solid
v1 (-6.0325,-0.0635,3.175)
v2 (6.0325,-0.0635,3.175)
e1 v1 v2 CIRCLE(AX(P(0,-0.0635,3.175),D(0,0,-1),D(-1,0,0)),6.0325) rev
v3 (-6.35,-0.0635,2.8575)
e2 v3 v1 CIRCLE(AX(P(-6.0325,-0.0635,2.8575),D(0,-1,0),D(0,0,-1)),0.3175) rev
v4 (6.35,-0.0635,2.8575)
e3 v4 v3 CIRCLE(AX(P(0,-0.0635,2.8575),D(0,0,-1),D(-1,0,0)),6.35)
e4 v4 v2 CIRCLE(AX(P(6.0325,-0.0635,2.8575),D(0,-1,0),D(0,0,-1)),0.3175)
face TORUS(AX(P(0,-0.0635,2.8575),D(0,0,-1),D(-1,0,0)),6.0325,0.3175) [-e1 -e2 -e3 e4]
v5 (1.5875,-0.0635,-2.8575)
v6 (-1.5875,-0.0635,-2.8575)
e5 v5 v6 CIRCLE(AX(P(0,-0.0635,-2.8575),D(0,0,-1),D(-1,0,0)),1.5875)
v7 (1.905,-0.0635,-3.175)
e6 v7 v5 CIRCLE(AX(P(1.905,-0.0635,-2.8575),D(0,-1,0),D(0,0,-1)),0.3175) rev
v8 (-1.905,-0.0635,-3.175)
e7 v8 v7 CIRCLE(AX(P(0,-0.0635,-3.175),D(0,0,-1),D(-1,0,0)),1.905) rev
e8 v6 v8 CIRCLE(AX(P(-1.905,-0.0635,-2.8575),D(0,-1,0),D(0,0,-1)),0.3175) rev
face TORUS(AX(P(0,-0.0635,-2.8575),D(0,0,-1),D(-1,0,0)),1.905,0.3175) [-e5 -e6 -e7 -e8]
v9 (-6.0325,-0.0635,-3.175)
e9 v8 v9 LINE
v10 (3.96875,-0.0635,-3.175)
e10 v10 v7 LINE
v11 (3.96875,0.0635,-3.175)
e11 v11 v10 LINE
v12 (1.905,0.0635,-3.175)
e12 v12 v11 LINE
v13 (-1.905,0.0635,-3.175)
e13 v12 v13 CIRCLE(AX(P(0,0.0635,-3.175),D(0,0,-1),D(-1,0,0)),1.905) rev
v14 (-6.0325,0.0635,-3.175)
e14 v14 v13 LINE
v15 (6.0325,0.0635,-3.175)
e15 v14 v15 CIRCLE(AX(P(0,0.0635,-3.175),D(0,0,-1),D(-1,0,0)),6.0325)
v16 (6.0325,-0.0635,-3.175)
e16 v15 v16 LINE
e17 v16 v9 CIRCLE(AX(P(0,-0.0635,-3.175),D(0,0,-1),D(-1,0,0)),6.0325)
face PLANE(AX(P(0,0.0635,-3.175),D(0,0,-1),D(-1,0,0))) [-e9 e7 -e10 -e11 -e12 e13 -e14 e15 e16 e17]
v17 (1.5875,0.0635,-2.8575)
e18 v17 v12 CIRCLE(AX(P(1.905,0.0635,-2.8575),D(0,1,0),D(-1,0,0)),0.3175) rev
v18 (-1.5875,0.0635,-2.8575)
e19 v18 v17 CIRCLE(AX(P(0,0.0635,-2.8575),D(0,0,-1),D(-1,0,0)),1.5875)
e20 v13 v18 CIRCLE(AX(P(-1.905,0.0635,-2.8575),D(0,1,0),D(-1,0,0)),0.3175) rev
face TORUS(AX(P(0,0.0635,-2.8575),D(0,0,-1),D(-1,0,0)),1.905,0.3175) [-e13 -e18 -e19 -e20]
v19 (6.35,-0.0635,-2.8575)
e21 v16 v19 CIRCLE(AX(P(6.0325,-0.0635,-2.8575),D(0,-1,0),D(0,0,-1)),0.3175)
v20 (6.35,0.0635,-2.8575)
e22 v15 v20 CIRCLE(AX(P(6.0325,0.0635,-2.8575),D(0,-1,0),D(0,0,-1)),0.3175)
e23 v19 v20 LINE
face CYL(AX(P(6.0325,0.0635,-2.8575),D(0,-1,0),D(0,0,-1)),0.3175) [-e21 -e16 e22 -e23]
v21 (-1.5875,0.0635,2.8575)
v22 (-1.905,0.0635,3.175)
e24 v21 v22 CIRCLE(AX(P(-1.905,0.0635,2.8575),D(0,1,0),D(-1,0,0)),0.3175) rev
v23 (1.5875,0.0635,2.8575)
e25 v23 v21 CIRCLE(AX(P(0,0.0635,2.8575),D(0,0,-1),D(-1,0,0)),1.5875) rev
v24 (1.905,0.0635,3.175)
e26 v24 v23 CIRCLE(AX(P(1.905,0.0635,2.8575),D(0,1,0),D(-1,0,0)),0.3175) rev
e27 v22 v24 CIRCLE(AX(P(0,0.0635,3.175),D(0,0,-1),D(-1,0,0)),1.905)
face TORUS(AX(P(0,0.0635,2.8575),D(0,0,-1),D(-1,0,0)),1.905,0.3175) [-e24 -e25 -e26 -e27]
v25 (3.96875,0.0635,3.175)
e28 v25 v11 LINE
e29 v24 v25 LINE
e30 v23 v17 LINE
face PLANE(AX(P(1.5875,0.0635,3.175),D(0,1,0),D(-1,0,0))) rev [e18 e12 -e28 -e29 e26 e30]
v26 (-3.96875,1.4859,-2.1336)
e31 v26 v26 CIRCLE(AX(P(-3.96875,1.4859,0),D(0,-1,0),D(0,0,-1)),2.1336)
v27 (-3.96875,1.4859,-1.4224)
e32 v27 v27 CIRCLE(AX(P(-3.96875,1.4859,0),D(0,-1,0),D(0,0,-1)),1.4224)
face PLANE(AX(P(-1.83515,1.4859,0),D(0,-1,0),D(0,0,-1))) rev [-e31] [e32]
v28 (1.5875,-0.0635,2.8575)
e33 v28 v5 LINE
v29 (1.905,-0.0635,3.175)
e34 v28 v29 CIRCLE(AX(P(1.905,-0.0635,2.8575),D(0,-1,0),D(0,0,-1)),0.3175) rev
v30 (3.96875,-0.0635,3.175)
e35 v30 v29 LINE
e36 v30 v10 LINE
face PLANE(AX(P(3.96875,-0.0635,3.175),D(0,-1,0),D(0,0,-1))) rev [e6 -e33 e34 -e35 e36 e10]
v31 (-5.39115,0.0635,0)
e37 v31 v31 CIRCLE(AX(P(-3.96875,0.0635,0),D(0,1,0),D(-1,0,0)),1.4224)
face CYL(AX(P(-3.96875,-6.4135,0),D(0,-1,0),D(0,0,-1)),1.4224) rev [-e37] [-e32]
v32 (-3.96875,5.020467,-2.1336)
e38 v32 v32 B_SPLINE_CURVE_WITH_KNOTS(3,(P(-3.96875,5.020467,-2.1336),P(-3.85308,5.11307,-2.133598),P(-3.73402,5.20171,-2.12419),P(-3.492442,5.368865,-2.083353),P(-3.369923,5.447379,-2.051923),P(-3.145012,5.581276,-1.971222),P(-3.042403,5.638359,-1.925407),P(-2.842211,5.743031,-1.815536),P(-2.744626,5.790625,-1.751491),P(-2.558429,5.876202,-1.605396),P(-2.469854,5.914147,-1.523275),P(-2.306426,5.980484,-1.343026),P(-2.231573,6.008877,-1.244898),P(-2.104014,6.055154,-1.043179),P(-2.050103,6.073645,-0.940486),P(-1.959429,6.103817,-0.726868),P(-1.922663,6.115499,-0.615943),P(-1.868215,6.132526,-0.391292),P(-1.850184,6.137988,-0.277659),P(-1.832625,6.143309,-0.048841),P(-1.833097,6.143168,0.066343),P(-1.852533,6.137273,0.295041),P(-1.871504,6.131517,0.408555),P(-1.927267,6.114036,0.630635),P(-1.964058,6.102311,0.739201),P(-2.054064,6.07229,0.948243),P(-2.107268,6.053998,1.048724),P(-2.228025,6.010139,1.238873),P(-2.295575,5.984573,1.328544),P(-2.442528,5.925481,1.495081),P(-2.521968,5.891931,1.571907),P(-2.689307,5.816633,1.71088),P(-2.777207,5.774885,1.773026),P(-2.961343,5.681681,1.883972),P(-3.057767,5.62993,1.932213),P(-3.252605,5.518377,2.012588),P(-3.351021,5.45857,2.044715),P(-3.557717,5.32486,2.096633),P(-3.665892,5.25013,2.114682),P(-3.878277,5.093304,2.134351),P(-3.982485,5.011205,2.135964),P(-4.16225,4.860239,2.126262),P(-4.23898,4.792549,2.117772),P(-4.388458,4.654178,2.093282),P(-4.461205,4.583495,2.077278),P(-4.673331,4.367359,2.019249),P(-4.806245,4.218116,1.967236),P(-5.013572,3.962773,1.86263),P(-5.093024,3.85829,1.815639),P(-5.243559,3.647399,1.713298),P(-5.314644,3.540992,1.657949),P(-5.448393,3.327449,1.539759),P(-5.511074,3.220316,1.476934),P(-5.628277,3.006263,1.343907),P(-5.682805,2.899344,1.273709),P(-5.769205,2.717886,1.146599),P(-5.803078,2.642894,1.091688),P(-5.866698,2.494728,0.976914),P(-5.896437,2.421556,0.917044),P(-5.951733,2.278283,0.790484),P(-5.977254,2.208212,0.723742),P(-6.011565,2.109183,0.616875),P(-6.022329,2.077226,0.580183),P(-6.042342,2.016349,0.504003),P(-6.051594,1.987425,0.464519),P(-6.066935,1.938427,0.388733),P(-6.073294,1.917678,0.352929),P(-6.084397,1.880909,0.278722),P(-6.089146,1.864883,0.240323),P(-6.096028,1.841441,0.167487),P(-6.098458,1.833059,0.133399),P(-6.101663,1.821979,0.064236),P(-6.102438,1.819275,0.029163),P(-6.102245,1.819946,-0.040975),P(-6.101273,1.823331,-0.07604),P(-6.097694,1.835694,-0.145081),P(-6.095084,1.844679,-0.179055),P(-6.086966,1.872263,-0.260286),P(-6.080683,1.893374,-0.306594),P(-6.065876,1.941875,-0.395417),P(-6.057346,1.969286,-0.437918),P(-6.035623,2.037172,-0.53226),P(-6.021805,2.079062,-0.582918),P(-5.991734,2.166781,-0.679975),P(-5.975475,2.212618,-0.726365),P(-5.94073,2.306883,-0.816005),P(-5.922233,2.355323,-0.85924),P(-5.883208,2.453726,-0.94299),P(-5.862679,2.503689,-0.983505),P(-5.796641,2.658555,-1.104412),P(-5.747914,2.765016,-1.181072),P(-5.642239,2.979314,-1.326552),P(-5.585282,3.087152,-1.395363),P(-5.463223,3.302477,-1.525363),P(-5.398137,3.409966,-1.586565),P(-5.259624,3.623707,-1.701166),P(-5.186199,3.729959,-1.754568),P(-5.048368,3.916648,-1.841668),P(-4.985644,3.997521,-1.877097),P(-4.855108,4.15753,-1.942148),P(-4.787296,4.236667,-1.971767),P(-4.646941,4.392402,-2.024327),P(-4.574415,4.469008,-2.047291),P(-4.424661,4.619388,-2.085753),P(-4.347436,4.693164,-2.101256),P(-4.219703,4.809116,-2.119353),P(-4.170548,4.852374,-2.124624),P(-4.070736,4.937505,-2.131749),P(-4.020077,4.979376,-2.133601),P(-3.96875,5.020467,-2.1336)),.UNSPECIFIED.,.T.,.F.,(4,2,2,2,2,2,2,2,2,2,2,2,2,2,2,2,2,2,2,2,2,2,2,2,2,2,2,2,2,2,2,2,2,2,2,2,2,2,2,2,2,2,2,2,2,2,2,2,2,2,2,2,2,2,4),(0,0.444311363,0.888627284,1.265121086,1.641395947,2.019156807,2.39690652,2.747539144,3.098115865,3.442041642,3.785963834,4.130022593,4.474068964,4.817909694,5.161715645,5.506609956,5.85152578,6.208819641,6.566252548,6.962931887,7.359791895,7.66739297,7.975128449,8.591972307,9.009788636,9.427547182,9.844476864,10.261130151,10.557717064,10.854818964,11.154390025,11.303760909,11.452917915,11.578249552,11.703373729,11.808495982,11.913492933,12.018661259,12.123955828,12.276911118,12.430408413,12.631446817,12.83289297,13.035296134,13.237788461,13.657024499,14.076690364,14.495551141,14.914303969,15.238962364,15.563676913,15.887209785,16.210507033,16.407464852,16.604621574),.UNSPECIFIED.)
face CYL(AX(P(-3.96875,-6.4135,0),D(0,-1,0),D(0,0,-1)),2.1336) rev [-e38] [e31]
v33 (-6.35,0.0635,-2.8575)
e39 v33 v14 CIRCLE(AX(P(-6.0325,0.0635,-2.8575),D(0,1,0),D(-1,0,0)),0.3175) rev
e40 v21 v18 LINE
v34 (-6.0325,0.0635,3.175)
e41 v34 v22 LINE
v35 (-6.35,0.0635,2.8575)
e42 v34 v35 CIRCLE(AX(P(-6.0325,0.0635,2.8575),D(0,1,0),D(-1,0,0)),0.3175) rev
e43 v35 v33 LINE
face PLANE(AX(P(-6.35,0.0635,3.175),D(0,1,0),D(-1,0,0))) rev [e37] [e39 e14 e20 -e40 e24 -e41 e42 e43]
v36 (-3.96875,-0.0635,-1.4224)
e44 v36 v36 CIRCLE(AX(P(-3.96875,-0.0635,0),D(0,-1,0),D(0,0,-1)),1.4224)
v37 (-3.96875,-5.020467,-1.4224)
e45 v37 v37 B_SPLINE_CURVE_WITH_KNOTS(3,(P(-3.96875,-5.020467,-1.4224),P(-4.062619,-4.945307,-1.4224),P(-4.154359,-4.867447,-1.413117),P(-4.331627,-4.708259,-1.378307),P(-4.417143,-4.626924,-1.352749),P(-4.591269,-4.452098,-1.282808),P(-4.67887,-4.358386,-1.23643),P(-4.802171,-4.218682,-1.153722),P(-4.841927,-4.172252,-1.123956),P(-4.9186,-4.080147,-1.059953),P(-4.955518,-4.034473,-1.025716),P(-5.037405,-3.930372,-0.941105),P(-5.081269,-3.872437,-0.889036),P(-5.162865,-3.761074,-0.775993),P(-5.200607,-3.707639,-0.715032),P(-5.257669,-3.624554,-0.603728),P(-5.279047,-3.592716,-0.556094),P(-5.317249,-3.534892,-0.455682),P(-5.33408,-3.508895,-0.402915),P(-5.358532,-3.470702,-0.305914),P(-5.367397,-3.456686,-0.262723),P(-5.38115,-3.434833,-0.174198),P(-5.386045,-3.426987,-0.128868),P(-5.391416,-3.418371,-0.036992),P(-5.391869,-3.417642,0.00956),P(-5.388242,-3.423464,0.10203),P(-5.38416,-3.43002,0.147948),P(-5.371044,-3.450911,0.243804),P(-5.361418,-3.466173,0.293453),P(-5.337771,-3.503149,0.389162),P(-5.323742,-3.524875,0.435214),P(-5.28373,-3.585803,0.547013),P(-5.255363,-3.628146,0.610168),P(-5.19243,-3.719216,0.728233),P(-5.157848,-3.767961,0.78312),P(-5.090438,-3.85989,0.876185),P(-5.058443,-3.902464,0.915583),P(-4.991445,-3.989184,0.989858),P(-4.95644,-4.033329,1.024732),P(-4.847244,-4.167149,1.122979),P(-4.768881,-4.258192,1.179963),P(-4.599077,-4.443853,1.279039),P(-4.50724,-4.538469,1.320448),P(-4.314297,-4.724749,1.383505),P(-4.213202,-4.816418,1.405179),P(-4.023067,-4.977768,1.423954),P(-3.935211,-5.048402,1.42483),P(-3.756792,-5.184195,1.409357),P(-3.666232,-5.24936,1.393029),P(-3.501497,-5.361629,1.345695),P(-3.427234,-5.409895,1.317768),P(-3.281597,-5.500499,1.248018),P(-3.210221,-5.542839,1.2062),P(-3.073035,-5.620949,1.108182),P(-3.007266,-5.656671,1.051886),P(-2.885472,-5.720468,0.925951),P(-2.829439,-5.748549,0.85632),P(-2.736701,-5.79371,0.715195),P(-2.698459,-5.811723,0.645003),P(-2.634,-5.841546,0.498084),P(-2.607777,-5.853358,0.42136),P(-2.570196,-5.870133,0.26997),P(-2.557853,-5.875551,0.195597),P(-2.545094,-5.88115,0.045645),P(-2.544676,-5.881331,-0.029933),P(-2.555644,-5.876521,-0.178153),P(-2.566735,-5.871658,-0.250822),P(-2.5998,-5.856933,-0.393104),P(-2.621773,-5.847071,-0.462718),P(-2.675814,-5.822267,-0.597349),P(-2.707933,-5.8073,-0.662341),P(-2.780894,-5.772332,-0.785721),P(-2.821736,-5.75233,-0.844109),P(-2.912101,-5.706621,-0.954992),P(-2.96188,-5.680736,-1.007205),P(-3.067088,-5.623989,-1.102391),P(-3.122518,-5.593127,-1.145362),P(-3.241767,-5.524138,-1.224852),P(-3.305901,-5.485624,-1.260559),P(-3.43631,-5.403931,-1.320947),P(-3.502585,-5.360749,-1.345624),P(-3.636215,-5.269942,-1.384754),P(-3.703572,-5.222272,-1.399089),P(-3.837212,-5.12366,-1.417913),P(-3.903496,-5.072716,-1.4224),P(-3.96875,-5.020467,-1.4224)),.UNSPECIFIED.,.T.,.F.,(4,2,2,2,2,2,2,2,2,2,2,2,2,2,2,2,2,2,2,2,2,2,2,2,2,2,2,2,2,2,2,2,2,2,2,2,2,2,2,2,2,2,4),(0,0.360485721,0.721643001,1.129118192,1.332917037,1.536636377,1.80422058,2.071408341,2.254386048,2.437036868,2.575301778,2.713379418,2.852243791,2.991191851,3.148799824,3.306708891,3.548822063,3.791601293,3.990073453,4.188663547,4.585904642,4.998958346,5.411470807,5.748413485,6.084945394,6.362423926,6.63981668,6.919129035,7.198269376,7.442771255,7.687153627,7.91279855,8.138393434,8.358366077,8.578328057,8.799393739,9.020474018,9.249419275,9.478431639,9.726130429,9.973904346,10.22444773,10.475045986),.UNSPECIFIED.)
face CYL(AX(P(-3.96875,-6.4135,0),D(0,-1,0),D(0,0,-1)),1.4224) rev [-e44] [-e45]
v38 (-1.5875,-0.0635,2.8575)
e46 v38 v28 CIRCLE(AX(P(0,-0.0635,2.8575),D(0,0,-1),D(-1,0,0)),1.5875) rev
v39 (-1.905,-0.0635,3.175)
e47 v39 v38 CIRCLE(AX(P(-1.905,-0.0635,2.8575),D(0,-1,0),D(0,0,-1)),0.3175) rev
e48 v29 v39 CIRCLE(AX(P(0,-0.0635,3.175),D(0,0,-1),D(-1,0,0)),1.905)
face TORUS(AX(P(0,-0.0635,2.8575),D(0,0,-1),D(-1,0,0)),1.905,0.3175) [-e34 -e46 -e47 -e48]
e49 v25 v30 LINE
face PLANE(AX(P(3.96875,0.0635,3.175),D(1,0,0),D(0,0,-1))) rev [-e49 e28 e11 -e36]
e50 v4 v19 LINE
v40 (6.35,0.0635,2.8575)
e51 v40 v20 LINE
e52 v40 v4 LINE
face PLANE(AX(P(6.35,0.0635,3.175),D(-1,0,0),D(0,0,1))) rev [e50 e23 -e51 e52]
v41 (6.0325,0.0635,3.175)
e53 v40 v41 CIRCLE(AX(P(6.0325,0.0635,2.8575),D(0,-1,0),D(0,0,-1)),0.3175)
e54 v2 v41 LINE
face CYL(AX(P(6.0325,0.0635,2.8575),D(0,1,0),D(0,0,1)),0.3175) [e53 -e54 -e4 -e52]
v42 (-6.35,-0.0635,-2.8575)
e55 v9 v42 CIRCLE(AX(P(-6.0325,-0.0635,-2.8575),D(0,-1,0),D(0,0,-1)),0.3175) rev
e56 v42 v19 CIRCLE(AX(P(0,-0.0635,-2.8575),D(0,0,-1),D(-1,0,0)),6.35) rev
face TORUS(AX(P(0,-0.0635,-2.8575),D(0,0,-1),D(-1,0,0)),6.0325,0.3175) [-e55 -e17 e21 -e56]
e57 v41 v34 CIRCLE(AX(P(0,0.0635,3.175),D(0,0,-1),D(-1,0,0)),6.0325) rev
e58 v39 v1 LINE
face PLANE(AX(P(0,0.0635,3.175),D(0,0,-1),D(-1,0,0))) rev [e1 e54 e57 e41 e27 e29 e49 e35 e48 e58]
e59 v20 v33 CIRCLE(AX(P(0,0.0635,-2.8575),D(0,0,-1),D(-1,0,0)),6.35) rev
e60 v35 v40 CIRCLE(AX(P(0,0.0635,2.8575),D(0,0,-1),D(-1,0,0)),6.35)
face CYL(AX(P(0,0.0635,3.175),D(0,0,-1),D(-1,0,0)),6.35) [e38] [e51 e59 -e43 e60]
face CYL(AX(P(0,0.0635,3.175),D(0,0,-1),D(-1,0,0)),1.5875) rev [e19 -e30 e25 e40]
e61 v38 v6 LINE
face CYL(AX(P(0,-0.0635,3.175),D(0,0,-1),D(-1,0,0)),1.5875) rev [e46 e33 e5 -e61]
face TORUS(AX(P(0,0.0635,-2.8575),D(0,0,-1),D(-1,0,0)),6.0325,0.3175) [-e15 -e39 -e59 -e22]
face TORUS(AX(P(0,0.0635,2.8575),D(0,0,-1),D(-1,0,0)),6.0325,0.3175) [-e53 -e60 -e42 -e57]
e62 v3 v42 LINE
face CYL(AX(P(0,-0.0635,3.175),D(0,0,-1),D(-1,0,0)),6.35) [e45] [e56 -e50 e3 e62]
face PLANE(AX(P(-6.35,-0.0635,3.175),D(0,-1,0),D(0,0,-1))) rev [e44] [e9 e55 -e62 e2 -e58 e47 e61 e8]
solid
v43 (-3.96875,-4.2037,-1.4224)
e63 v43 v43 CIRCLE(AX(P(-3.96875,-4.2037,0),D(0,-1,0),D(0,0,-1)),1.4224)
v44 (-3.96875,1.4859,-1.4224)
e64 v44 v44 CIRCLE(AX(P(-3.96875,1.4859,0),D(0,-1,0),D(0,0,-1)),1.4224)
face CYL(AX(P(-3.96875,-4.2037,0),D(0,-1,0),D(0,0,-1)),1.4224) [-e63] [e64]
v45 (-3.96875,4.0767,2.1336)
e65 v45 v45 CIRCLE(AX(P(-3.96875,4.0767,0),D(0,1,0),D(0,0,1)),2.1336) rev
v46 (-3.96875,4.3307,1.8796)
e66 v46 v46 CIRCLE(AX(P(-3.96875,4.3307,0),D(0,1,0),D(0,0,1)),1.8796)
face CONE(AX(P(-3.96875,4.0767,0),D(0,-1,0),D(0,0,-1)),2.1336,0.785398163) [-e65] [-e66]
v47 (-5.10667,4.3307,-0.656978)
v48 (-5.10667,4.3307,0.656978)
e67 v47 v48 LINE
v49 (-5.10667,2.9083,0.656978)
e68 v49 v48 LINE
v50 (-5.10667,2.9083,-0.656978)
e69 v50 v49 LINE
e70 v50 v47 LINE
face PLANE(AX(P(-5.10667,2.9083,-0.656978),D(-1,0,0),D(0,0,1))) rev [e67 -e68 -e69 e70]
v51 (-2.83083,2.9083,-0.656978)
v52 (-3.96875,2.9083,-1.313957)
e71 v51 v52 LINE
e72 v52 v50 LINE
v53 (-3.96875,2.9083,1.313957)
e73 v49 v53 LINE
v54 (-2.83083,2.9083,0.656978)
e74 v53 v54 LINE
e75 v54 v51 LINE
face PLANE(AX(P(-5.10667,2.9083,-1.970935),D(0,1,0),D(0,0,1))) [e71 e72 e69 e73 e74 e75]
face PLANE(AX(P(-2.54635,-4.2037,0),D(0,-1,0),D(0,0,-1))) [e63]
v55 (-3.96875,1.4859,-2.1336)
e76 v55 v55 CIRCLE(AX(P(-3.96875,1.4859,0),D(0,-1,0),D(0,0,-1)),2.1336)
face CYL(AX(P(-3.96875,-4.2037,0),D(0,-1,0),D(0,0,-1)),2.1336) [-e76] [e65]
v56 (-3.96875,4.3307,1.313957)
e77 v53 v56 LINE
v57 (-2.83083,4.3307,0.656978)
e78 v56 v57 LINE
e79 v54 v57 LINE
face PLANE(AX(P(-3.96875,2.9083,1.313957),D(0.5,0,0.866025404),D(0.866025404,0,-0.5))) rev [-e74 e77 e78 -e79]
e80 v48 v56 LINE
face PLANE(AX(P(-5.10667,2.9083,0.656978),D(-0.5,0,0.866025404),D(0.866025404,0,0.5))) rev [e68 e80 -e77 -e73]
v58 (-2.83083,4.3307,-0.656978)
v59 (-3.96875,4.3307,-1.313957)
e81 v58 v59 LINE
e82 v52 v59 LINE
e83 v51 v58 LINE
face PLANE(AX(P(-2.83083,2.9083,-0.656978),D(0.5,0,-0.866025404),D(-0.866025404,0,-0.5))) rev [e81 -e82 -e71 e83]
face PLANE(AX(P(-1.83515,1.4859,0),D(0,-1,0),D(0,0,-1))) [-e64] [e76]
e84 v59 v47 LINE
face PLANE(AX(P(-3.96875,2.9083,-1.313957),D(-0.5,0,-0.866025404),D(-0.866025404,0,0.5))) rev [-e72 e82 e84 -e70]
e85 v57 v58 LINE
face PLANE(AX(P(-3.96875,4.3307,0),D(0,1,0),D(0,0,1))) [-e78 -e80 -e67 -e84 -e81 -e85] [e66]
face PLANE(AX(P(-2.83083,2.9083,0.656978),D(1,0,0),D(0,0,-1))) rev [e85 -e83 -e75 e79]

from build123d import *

# Parameters (mm, degrees)
EXTRUDE1_DEPTH     = 3.175
CUT_EXTRUDE2_DEPTH = 1.4224
FILLET1_R          = 0.3175
FILLET2_R          = 0.3175
CHAMFER2_SIZE      = 0.254


with BuildPart() as part:
    # Sketch1 → Extrude1 (new, symmetric)
    with BuildSketch(Plane.XY):
        with BuildLine():
            Line((-6.35, 0.0635), (-1.5875, 0.0635))
            ThreePointArc((-1.5875, 0.0635), (0, 1.651), (1.5875, 0.0635))
            Line((1.5875, 0.0635), (3.96875, 0.0635))
            Line((3.96875, 0.0635), (3.96875, -0.0635))
            Line((3.96875, -0.0635), (1.5875, -0.0635))
            ThreePointArc((1.5875, -0.0635), (0, -1.651), (-1.5875, -0.0635))
            Line((-1.5875, -0.0635), (-6.35, -0.0635))
            ThreePointArc((-6.35, -0.0635), (0, -6.4135), (6.35, -0.0635))
            Line((6.35, -0.0635), (6.35, 0.0635))
            ThreePointArc((6.35, 0.0635), (0, 6.4135), (-6.35, 0.0635))
        make_face()
    extrude(amount=EXTRUDE1_DEPTH, both=True)

    # Sketch4 → Cut-Revolve1 (revolve, cut)
    with BuildSketch(Plane.XY):
        Polygon((-3.96875, 6.4135), (-1.83515, 6.4135), (-1.83515, 1.4859), (-2.54635, 1.4859), (-2.54635, -6.4135), (-3.96875, -6.4135), align=None)
    revolve(axis=Axis((-3.96875, -6.4135, 0), (0, 1, 0)), mode=Mode.SUBTRACT)

    # Fillet1
    fillet1_edges = [part.edges().sort_by_distance(p)[0] for p in [
        (0, 1.651, -3.175),
        (0, 1.651, 3.175),
        (0, 6.4135, -3.175),
        (0, 6.4135, 3.175),
        (0, -6.4135, -3.175),
        (0, -6.4135, 3.175),
        (6.35, 0, -3.175),
        (6.35, 0, 3.175),
    ]]
    fillet(fillet1_edges, radius=FILLET1_R)

    # Fillet2
    fillet2_edges = [part.edges().sort_by_distance(p)[0] for p in [
        (0, -1.651, -3.175),
        (0, -1.651, 3.175),
    ]]
    fillet(fillet2_edges, radius=FILLET2_R)


with BuildPart() as body_2:
    # Sketch6 → Revolve1 (revolve)
    with BuildSketch(Plane.XY):
        Polygon((-3.96875, 4.3307), (-1.83515, 4.3307), (-1.83515, 1.4859), (-2.54635, 1.4859), (-2.54635, -4.2037), (-3.96875, -4.2037), align=None)
    revolve(axis=Axis((-3.96875, -4.2037, 0), (0, 1, 0)))

    # Sketch7 → Cut-Extrude2 (cut)
    with BuildSketch(Plane(origin=(0, 4.3307, 0), x_dir=(-1, 0, 0), z_dir=(0, 1, 0))):
        Polygon((3.96875, -1.313956837), (5.10667, -0.656978418), (5.10667, 0.656978418), (3.96875, 1.313956837), (2.83083, 0.656978418), (2.83083, -0.656978418), align=None)
    extrude(amount=-CUT_EXTRUDE2_DEPTH, mode=Mode.SUBTRACT)

    # Chamfer2
    chamfer2_edges = [body_2.edges().sort_by_distance(p)[0] for p in [
        (-6.10235, 4.3307, 0),
    ]]
    chamfer(chamfer2_edges, length=CHAMFER2_SIZE)


solid = Compound([part.part, body_2.part])
